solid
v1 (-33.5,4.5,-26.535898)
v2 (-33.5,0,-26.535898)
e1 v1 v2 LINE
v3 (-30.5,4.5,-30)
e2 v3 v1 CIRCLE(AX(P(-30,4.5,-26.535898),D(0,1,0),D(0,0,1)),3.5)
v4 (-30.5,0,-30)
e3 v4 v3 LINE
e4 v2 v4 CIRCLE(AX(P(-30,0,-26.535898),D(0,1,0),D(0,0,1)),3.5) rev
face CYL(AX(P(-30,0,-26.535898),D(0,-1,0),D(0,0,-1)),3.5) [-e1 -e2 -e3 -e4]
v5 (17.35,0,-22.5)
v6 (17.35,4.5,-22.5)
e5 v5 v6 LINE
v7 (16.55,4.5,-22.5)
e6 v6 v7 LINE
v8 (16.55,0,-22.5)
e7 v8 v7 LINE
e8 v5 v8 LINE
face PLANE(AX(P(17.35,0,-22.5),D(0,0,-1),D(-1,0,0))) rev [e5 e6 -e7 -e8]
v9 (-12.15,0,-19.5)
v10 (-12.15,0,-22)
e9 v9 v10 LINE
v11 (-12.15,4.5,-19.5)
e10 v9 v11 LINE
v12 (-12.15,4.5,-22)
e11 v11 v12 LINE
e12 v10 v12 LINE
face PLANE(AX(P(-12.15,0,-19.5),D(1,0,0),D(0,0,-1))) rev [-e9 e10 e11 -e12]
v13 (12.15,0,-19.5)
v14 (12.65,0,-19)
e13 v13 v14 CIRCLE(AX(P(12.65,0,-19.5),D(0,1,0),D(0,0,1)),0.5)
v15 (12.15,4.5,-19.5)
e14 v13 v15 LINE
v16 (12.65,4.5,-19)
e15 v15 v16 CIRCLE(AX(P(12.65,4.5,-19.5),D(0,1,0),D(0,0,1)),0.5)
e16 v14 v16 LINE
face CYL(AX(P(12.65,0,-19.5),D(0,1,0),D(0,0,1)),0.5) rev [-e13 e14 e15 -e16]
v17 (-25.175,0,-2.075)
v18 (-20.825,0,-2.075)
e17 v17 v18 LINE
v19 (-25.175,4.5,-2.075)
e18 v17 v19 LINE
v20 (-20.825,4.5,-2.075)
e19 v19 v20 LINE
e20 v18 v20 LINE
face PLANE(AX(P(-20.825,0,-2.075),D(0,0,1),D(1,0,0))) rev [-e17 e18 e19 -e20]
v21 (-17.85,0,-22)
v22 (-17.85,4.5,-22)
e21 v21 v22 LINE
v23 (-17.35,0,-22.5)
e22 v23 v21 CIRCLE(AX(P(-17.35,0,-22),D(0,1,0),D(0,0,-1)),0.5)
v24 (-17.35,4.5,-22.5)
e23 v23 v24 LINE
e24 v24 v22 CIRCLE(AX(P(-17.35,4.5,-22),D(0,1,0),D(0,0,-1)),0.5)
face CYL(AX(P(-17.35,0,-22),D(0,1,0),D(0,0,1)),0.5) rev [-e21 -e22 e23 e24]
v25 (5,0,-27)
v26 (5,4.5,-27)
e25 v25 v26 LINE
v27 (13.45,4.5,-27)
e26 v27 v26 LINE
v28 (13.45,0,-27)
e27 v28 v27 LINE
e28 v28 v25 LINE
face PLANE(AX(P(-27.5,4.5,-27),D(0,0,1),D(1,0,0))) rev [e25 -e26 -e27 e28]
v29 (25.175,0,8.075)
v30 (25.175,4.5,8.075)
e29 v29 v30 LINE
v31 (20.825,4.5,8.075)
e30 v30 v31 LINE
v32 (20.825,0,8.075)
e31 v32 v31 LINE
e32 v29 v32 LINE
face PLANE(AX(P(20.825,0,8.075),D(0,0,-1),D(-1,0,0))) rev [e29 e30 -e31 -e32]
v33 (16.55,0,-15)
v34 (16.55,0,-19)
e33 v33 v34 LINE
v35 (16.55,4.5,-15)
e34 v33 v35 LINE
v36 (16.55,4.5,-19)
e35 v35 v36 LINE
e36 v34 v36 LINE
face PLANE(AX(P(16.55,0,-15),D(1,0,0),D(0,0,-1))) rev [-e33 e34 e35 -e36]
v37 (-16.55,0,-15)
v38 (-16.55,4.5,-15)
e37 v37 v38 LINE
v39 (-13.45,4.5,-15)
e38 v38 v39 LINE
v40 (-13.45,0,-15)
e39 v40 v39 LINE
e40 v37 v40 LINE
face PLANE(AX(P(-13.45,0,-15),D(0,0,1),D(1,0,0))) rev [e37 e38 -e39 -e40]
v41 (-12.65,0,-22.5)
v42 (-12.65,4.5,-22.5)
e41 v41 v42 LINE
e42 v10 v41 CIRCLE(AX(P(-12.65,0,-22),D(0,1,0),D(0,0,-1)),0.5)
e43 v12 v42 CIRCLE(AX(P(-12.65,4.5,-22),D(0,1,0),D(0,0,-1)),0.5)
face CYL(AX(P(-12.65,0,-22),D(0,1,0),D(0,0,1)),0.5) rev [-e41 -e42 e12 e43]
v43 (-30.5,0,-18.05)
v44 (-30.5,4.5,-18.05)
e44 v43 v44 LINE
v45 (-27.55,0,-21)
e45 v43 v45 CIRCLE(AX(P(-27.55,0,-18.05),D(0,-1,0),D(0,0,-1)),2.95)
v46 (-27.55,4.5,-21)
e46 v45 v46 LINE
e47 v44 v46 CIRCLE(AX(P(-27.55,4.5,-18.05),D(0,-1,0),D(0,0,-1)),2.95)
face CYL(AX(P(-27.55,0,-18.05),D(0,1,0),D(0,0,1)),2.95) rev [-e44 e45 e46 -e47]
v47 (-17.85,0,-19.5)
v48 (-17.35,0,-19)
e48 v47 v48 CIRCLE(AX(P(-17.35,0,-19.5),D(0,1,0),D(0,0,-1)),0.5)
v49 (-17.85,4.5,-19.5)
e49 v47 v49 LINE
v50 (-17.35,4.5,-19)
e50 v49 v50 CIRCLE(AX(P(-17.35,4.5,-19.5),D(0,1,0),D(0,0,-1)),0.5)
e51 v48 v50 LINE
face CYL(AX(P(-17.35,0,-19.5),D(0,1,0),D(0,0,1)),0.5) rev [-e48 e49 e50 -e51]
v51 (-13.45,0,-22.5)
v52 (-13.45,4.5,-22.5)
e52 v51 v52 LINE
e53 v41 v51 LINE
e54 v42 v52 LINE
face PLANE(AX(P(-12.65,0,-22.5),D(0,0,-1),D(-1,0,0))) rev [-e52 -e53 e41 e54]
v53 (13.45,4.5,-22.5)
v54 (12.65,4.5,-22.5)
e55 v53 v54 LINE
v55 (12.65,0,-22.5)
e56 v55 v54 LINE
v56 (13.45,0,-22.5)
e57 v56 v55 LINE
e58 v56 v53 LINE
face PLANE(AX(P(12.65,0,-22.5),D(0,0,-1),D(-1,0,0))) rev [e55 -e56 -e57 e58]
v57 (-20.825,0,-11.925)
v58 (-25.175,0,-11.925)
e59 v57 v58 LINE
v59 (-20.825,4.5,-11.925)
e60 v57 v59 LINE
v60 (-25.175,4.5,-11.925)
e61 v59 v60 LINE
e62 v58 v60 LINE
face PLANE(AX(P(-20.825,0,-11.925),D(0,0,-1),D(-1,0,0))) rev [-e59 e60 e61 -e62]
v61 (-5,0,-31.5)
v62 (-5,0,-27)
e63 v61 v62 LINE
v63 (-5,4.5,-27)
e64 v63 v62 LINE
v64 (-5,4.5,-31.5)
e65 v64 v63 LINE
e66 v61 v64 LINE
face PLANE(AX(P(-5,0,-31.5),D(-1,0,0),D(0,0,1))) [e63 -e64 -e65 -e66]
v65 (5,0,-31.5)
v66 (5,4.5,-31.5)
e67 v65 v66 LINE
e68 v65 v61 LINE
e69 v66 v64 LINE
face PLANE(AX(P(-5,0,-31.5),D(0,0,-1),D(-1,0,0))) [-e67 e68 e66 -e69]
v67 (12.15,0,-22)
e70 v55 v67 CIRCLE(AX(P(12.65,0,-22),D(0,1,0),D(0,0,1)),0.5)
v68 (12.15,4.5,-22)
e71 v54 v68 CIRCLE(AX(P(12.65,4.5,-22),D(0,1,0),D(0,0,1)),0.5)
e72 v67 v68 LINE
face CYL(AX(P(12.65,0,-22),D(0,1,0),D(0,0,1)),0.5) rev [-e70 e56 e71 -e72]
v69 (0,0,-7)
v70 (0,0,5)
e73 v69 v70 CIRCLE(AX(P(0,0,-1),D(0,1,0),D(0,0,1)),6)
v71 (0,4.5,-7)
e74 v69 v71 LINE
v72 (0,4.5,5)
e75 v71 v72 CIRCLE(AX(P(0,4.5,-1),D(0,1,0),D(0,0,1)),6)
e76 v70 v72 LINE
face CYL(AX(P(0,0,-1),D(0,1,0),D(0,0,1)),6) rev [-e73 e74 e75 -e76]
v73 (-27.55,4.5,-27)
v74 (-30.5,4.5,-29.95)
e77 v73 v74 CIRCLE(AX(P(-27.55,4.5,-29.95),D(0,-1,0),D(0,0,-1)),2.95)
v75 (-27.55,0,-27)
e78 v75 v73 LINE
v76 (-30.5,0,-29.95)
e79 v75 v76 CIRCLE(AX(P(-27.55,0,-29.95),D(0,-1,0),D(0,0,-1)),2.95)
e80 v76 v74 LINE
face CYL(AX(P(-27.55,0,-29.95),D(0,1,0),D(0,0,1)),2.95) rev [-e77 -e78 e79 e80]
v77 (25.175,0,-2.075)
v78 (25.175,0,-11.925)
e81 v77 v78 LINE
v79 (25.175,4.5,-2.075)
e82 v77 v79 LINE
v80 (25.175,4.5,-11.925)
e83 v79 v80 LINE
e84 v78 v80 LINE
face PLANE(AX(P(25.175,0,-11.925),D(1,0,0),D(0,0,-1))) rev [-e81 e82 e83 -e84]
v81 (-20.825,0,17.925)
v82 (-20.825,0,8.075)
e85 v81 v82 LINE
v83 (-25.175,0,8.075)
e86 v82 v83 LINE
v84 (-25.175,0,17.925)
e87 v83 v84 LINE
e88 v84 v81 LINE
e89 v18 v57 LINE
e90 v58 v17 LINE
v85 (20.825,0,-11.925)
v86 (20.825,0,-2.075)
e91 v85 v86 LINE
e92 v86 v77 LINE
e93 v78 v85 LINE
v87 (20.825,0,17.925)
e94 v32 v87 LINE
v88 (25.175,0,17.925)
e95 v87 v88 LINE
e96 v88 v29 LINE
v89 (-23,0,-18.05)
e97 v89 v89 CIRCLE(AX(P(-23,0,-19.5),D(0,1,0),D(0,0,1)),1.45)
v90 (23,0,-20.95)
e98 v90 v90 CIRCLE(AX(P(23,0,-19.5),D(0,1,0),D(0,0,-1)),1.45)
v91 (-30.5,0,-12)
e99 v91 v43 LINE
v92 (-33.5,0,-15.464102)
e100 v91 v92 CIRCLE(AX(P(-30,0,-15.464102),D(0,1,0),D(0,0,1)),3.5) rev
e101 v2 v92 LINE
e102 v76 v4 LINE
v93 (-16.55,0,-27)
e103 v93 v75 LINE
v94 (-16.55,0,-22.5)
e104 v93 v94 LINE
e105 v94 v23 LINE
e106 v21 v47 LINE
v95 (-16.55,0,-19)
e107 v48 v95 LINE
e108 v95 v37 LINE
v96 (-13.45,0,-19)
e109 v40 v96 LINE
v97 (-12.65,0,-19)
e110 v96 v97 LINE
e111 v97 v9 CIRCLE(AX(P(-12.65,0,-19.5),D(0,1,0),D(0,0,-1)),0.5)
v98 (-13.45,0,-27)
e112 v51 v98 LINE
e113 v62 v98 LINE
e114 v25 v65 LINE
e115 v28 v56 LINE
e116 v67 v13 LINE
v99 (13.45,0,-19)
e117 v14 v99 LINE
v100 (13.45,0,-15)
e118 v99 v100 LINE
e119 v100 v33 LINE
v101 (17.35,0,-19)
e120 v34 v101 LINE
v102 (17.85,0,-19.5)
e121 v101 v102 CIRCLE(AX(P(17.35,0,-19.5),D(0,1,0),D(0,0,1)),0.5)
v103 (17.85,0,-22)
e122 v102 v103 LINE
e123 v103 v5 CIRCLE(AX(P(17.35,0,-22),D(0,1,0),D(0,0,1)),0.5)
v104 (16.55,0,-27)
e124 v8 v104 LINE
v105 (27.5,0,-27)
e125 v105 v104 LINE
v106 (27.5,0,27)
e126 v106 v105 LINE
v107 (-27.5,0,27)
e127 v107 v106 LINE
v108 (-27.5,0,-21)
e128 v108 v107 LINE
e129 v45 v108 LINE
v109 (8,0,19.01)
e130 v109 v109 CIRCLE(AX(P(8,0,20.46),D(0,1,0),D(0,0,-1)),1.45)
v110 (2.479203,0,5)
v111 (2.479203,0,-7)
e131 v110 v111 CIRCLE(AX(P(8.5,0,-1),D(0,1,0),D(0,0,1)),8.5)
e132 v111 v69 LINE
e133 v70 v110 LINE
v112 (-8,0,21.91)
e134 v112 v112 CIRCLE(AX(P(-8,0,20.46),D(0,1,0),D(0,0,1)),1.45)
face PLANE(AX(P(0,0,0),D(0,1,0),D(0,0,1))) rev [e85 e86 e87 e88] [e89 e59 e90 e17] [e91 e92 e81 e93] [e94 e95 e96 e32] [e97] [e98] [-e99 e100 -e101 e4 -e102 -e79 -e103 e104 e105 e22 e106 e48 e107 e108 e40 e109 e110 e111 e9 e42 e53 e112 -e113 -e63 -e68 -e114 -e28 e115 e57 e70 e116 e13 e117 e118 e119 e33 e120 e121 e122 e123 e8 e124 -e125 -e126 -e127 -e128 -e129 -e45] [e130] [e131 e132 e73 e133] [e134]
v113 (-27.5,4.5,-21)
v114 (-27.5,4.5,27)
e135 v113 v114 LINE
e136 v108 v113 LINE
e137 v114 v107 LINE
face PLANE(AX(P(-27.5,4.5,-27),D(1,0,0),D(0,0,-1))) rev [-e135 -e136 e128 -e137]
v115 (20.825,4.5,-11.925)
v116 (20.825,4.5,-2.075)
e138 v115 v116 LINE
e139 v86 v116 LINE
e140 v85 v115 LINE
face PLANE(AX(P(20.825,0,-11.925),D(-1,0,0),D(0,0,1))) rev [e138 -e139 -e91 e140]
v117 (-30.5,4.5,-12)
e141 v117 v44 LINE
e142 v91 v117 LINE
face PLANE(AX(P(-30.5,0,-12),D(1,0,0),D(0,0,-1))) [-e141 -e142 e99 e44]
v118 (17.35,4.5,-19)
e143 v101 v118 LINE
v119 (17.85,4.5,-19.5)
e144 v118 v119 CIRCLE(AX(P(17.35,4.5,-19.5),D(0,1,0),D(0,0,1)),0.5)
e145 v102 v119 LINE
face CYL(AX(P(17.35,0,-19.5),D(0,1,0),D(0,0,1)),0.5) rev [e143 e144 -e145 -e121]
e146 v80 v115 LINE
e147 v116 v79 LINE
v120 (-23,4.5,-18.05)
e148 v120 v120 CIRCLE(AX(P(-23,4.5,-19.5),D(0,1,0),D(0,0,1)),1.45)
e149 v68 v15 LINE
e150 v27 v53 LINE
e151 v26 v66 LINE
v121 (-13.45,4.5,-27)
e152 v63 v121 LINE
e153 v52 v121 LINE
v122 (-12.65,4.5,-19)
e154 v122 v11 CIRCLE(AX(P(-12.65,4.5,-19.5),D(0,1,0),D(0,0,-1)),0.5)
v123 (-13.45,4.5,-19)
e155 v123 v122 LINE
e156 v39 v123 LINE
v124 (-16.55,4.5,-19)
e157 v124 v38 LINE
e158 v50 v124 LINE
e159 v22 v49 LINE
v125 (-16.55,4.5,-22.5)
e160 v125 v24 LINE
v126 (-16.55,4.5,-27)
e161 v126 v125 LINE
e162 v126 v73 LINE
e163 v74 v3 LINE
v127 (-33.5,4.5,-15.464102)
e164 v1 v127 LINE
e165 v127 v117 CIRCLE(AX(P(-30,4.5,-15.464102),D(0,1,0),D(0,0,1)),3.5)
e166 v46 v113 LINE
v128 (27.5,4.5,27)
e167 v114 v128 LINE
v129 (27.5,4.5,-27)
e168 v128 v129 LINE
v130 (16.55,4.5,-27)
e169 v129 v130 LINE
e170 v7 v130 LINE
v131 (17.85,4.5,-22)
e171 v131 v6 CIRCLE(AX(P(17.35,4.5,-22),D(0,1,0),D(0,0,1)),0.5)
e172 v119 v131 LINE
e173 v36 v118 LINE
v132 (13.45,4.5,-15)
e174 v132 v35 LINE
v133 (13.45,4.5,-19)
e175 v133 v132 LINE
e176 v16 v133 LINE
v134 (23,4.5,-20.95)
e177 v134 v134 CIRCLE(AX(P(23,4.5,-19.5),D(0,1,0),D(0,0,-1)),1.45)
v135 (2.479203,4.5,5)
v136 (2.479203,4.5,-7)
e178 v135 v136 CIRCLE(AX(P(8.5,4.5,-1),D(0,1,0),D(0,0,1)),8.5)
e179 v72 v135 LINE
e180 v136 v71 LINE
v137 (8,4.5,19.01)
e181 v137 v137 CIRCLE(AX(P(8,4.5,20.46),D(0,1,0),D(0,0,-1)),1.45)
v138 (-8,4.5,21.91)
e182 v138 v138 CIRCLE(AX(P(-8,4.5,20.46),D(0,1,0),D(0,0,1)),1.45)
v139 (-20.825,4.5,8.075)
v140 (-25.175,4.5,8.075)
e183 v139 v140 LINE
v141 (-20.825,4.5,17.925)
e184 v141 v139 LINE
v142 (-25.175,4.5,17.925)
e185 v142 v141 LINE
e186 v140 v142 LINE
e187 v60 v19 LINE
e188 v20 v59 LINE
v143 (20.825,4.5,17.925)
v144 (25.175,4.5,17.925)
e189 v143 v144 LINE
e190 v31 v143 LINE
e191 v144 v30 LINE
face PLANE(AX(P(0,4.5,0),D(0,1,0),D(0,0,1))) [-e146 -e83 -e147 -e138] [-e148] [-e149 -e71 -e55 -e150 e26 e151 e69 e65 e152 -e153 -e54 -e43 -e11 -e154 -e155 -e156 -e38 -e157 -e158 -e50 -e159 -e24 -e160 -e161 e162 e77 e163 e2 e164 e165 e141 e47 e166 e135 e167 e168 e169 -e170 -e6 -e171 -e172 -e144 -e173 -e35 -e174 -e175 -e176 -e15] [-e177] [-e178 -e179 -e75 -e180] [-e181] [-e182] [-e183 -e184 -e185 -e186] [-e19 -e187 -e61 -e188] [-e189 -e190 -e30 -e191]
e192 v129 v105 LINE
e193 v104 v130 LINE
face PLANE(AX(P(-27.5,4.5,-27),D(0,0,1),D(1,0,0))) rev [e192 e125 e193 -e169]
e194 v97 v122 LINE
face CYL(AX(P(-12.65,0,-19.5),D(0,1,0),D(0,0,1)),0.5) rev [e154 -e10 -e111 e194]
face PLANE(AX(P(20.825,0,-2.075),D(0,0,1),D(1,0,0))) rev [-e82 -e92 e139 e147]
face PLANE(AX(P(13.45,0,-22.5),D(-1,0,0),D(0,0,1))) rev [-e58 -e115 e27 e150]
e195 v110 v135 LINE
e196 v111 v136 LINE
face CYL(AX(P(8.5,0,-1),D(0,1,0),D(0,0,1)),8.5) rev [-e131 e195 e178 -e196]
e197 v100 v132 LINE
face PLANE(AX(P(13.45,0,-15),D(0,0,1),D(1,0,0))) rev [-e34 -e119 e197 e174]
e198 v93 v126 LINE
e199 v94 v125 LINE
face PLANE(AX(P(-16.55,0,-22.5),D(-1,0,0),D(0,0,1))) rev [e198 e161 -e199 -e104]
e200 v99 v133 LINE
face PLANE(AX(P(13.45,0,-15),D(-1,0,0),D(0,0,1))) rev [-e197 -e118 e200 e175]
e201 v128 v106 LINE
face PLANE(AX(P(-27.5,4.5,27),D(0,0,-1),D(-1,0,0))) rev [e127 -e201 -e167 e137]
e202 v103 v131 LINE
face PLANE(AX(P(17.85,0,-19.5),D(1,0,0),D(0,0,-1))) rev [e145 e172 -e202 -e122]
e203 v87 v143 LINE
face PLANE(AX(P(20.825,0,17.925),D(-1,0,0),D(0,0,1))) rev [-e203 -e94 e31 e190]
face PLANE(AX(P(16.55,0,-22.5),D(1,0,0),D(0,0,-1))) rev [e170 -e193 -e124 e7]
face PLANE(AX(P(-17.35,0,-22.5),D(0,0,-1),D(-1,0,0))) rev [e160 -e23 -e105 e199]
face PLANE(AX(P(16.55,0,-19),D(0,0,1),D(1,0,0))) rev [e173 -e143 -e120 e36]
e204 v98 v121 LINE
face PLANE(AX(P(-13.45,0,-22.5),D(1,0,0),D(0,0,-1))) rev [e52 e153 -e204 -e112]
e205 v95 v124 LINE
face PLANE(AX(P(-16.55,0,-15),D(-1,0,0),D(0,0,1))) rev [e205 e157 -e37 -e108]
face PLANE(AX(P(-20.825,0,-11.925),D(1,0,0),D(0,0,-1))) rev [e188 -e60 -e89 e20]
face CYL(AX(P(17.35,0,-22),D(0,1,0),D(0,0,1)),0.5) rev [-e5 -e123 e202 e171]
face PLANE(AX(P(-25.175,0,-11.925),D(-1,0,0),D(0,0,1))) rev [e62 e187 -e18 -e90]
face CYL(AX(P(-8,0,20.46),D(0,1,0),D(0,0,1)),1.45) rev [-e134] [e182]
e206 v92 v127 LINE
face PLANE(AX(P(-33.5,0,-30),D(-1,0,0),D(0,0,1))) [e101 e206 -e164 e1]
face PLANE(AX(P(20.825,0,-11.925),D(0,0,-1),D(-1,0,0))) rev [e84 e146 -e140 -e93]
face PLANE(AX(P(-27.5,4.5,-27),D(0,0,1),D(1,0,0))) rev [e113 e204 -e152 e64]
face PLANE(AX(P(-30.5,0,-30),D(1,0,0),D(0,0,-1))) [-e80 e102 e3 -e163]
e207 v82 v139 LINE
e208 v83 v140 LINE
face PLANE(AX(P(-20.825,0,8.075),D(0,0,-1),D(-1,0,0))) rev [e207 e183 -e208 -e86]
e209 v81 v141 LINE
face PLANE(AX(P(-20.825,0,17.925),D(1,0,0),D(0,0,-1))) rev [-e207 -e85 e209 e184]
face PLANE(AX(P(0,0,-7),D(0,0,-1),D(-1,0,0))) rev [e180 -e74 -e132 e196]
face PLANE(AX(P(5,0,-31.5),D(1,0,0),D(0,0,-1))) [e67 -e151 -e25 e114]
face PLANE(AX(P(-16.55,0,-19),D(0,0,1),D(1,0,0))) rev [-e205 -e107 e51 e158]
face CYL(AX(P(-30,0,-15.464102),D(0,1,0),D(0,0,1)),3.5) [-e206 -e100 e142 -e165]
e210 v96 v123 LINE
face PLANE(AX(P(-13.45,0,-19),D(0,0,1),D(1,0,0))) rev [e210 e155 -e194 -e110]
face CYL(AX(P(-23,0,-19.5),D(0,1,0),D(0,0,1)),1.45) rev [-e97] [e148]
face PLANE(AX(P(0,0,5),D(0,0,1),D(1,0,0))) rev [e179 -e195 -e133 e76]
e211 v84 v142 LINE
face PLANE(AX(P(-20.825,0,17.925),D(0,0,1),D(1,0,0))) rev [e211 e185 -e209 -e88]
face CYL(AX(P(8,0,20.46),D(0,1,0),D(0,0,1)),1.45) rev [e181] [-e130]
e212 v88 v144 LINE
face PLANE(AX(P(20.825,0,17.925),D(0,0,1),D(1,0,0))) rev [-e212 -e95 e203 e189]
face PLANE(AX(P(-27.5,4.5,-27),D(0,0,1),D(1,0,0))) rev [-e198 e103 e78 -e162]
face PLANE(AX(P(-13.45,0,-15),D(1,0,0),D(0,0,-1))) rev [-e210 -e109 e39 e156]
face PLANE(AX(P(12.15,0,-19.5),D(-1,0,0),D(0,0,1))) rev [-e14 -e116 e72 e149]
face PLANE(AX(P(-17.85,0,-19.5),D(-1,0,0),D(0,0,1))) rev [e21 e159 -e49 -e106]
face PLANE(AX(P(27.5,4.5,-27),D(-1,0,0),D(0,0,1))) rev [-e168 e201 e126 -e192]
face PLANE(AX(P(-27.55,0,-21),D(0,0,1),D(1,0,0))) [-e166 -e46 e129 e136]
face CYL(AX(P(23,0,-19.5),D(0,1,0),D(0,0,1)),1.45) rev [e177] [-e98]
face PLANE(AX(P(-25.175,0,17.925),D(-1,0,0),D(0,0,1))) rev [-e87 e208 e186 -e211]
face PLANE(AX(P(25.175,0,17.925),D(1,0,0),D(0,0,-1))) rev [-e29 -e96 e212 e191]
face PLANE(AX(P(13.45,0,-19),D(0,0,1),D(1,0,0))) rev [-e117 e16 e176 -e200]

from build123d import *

# Parameters (mm, degrees)
SKETCH1_W           = 55
SKETCH1_H           = 54
MAINSHAPE_DEPTH     = 4.5
SKETCH2_W           = 10
SKETCH2_H           = 9
TAB1_DEPTH          = 4.5
CUT_EXTRUDE2_DEPTH  = 43.056509603
SKETCH5_W           = 4.35
SKETCH5_H           = 9.85
CUT_EXTRUDE3_DEPTH  = 43.056509603
SKETCH6_R           = 12
CUT_EXTRUDE4_DEPTH  = 43.056509603
SKETCH8_R           = 1.45
CUT_EXTRUDE6_DEPTH  = 43.056509603
SKETCH11_R          = 1.45
CUT_EXTRUDE8_DEPTH  = 43.056509603
SKETCH15_R          = 12
SKETCH15_R_2        = 6
BOSS_EXTRUDE2_DEPTH = 4.5
CUT_EXTRUDE10_DEPTH = 43.056509603
BOSS_EXTRUDE3_DEPTH = 4.5
FILLET1_R           = 3.5


with BuildPart() as part:
    # Sketch1 → MainShape (new body)
    with BuildSketch(Plane(origin=(0, 0, 0), x_dir=(1, 0, 0), z_dir=(0, 1, 0))):
        Rectangle(SKETCH1_W, SKETCH1_H)
    extrude(amount=MAINSHAPE_DEPTH)

    # Sketch2 → Tab1 (add, through all)
    with BuildSketch(Plane(origin=(0, 4.5, 0), x_dir=(1, 0, 0), z_dir=(0, 1, 0))):
        with Locations((0, 27)):
            Rectangle(SKETCH2_W, SKETCH2_H)
    extrude(amount=-TAB1_DEPTH)

    # Sketch4 → Cut-Extrude2 (cut, through all)
    with BuildSketch(Plane(origin=(0, 4.5, 0), x_dir=(1, 0, 0), z_dir=(0, 1, 0))):
        with BuildLine():
            Line((-13.45, 15), (-16.55, 15))
            Line((-16.55, 15), (-16.55, 19))
            Line((-16.55, 19), (-17.35, 19))
            ThreePointArc((-17.35, 19), (-17.703553391, 19.146446609), (-17.85, 19.5))
            Line((-17.85, 19.5), (-17.85, 22))
            ThreePointArc((-17.85, 22), (-17.703553391, 22.353553391), (-17.35, 22.5))
            Line((-17.35, 22.5), (-16.55, 22.5))
            Line((-16.55, 22.5), (-16.55, 27))
            Line((-16.55, 27), (-13.45, 27))
            Line((-13.45, 27), (-13.45, 22.5))
            Line((-13.45, 22.5), (-12.65, 22.5))
            ThreePointArc((-12.65, 22.5), (-12.296446609, 22.353553391), (-12.15, 22))
            Line((-12.15, 22), (-12.15, 19.5))
            ThreePointArc((-12.15, 19.5), (-12.296446609, 19.146446609), (-12.65, 19))
            Line((-12.65, 19), (-13.45, 19))
            Line((-13.45, 19), (-13.45, 15))
        make_face()
        with BuildLine():
            Line((13.45, 15), (13.45, 19))
            Line((13.45, 19), (12.65, 19))
            ThreePointArc((12.65, 19), (12.296446609, 19.146446609), (12.15, 19.5))
            Line((12.15, 19.5), (12.15, 22))
            ThreePointArc((12.15, 22), (12.296446609, 22.353553391), (12.65, 22.5))
            Line((12.65, 22.5), (13.45, 22.5))
            Line((13.45, 22.5), (13.45, 27))
            Line((13.45, 27), (16.55, 27))
            Line((16.55, 27), (16.55, 22.5))
            Line((16.55, 22.5), (17.35, 22.5))
            ThreePointArc((17.35, 22.5), (17.703553391, 22.353553391), (17.85, 22))
            Line((17.85, 22), (17.85, 19.5))
            ThreePointArc((17.85, 19.5), (17.703553391, 19.146446609), (17.35, 19))
            Line((17.35, 19), (16.55, 19))
            Line((16.55, 19), (16.55, 15))
            Line((16.55, 15), (13.45, 15))
        make_face()
    extrude(amount=-CUT_EXTRUDE2_DEPTH, mode=Mode.SUBTRACT)

    # Sketch5 → Cut-Extrude3 (cut, through all)
    with BuildSketch(Plane(origin=(0, 4.5, 0), x_dir=(1, 0, 0), z_dir=(0, 1, 0))):
        with Locations((23, 7)):
            Rectangle(SKETCH5_W, SKETCH5_H)
        with Locations((-23, 7)):
            Rectangle(SKETCH5_W, SKETCH5_H)
        with Locations((-23, -13)):
            Rectangle(SKETCH5_W, SKETCH5_H)
        with Locations((23, -13)):
            Rectangle(SKETCH5_W, SKETCH5_H)
    extrude(amount=-CUT_EXTRUDE3_DEPTH, mode=Mode.SUBTRACT)

    # Sketch6 → Cut-Extrude4 (cut, through all)
    with BuildSketch(Plane(origin=(0, 4.5, 0), x_dir=(1, 0, 0), z_dir=(0, 1, 0))):
        with Locations(Location((0, 1, 0), (0, 0, 270))):
            Circle(SKETCH6_R)
    extrude(amount=-CUT_EXTRUDE4_DEPTH, mode=Mode.SUBTRACT)

    # Sketch8 → Cut-Extrude6 (cut, through all)
    with BuildSketch(Plane(origin=(0, 4.5, 0), x_dir=(1, 0, 0), z_dir=(0, 1, 0))):
        with Locations(Location((-8, -20.46, 0), (0, 0, 270))):
            Circle(SKETCH8_R)
        with Locations(Location((8, -20.46, 0), (0, 0, 90))):
            Circle(SKETCH8_R)
    extrude(amount=-CUT_EXTRUDE6_DEPTH, mode=Mode.SUBTRACT)

    # Sketch11 → Cut-Extrude8 (cut, through all)
    with BuildSketch(Plane(origin=(0, 4.5, 0), x_dir=(1, 0, 0), z_dir=(0, 1, 0))):
        with Locations(Location((-23, 19.5, 0), (0, 0, 270))):
            Circle(SKETCH11_R)
        with Locations(Location((23, 19.5, 0), (0, 0, 90))):
            Circle(SKETCH11_R)
    extrude(amount=-CUT_EXTRUDE8_DEPTH, mode=Mode.SUBTRACT)

    # Sketch15 → Boss-Extrude2 (add, through all)
    with BuildSketch(Plane(origin=(0, 4.5, 0), x_dir=(1, 0, 0), z_dir=(0, 1, 0))):
        with Locations((0, 1)):
            Circle(SKETCH15_R)
        with Locations(Location((0, 1, 0), (0, 0, 270))):
            Circle(SKETCH15_R_2, mode=Mode.SUBTRACT)
    extrude(amount=-BOSS_EXTRUDE2_DEPTH)

    # Sketch16 → Cut-Extrude10 (cut, through all)
    with BuildSketch(Plane(origin=(0, 4.5, 0), x_dir=(1, 0, 0), z_dir=(0, 1, 0))):
        with BuildLine():
            Line((0, 7), (2.479202711, 7))
            ThreePointArc((2.479202711, 7), (17, 1), (2.479202711, -5))
            Line((2.479202711, -5), (0, -5))
            Line((0, -5), (0, 7))
        make_face()
    extrude(amount=-CUT_EXTRUDE10_DEPTH, mode=Mode.SUBTRACT)

    # Sketch18 → Boss-Extrude3 (add, through all)
    with BuildSketch(Plane(origin=(0, 4.5, 0), x_dir=(1, 0, 0), z_dir=(0, 1, 0))):
        with BuildLine():
            Line((-27.5, 27), (-27.55, 27))
            ThreePointArc((-27.55, 27), (-29.635965005, 27.864034995), (-30.5, 29.95))
            Line((-30.5, 29.95), (-30.5, 30))
            Line((-30.5, 30), (-33.5, 30))
            Line((-33.5, 30), (-33.5, 12))
            Line((-33.5, 12), (-30.5, 12))
            Line((-30.5, 12), (-30.5, 18.05))
            ThreePointArc((-30.5, 18.05), (-29.635965005, 20.135965005), (-27.55, 21))
            Line((-27.55, 21), (-27.5, 21))
            Line((-27.5, 21), (-27.5, 27))
        make_face()
    extrude(amount=-BOSS_EXTRUDE3_DEPTH)

    # Fillet1
    # the kernel refuses this fillet: 3.5 mm, written as the material it takes off along each edge
    with BuildSketch(Plane(origin=(-33.5, 13.160254038, -30), x_dir=(0, 0, 1), z_dir=(0, -1, 0))) as fillet1_piece_1:
        with BuildLine():
            CenterArc((3.464101615, -3.5), FILLET1_R, 90, 81.786789298)
            Line((0, -3), (-0.069282032, -2.99))
            ThreePointArc((-0.069282032, -2.99), (-0.07, -1.5), (-0.07, 0))
            Line((-0.07, 0), (0, 0.07))
            Line((0, 0.07), (3.464101615, 0.07))
            Line((3.464101615, 0.07), (3.464101615, 0))
        make_face()
    extrude(amount=21.820508076, mode=Mode.SUBTRACT)
    with BuildSketch(Plane(origin=(-33.5, 13.160254038, -12), x_dir=(1, 0, 0), z_dir=(0, -1, 0))) as fillet1_piece_2:
        with BuildLine():
            CenterArc((3.5, -3.464101615), FILLET1_R, 98.213210702, 81.786789298)
            Line((0, -3.464101615), (-0.07, -3.464101615))
            Line((-0.07, -3.464101615), (-0.07, 0))
            Line((-0.07, 0), (0, 0.07))
            ThreePointArc((0, 0.07), (1.5, 0.07), (2.99, 0.069282032))
            Line((2.99, 0.069282032), (3, 0))
        make_face()
    extrude(amount=21.820508076, mode=Mode.SUBTRACT)


solid = part.part
